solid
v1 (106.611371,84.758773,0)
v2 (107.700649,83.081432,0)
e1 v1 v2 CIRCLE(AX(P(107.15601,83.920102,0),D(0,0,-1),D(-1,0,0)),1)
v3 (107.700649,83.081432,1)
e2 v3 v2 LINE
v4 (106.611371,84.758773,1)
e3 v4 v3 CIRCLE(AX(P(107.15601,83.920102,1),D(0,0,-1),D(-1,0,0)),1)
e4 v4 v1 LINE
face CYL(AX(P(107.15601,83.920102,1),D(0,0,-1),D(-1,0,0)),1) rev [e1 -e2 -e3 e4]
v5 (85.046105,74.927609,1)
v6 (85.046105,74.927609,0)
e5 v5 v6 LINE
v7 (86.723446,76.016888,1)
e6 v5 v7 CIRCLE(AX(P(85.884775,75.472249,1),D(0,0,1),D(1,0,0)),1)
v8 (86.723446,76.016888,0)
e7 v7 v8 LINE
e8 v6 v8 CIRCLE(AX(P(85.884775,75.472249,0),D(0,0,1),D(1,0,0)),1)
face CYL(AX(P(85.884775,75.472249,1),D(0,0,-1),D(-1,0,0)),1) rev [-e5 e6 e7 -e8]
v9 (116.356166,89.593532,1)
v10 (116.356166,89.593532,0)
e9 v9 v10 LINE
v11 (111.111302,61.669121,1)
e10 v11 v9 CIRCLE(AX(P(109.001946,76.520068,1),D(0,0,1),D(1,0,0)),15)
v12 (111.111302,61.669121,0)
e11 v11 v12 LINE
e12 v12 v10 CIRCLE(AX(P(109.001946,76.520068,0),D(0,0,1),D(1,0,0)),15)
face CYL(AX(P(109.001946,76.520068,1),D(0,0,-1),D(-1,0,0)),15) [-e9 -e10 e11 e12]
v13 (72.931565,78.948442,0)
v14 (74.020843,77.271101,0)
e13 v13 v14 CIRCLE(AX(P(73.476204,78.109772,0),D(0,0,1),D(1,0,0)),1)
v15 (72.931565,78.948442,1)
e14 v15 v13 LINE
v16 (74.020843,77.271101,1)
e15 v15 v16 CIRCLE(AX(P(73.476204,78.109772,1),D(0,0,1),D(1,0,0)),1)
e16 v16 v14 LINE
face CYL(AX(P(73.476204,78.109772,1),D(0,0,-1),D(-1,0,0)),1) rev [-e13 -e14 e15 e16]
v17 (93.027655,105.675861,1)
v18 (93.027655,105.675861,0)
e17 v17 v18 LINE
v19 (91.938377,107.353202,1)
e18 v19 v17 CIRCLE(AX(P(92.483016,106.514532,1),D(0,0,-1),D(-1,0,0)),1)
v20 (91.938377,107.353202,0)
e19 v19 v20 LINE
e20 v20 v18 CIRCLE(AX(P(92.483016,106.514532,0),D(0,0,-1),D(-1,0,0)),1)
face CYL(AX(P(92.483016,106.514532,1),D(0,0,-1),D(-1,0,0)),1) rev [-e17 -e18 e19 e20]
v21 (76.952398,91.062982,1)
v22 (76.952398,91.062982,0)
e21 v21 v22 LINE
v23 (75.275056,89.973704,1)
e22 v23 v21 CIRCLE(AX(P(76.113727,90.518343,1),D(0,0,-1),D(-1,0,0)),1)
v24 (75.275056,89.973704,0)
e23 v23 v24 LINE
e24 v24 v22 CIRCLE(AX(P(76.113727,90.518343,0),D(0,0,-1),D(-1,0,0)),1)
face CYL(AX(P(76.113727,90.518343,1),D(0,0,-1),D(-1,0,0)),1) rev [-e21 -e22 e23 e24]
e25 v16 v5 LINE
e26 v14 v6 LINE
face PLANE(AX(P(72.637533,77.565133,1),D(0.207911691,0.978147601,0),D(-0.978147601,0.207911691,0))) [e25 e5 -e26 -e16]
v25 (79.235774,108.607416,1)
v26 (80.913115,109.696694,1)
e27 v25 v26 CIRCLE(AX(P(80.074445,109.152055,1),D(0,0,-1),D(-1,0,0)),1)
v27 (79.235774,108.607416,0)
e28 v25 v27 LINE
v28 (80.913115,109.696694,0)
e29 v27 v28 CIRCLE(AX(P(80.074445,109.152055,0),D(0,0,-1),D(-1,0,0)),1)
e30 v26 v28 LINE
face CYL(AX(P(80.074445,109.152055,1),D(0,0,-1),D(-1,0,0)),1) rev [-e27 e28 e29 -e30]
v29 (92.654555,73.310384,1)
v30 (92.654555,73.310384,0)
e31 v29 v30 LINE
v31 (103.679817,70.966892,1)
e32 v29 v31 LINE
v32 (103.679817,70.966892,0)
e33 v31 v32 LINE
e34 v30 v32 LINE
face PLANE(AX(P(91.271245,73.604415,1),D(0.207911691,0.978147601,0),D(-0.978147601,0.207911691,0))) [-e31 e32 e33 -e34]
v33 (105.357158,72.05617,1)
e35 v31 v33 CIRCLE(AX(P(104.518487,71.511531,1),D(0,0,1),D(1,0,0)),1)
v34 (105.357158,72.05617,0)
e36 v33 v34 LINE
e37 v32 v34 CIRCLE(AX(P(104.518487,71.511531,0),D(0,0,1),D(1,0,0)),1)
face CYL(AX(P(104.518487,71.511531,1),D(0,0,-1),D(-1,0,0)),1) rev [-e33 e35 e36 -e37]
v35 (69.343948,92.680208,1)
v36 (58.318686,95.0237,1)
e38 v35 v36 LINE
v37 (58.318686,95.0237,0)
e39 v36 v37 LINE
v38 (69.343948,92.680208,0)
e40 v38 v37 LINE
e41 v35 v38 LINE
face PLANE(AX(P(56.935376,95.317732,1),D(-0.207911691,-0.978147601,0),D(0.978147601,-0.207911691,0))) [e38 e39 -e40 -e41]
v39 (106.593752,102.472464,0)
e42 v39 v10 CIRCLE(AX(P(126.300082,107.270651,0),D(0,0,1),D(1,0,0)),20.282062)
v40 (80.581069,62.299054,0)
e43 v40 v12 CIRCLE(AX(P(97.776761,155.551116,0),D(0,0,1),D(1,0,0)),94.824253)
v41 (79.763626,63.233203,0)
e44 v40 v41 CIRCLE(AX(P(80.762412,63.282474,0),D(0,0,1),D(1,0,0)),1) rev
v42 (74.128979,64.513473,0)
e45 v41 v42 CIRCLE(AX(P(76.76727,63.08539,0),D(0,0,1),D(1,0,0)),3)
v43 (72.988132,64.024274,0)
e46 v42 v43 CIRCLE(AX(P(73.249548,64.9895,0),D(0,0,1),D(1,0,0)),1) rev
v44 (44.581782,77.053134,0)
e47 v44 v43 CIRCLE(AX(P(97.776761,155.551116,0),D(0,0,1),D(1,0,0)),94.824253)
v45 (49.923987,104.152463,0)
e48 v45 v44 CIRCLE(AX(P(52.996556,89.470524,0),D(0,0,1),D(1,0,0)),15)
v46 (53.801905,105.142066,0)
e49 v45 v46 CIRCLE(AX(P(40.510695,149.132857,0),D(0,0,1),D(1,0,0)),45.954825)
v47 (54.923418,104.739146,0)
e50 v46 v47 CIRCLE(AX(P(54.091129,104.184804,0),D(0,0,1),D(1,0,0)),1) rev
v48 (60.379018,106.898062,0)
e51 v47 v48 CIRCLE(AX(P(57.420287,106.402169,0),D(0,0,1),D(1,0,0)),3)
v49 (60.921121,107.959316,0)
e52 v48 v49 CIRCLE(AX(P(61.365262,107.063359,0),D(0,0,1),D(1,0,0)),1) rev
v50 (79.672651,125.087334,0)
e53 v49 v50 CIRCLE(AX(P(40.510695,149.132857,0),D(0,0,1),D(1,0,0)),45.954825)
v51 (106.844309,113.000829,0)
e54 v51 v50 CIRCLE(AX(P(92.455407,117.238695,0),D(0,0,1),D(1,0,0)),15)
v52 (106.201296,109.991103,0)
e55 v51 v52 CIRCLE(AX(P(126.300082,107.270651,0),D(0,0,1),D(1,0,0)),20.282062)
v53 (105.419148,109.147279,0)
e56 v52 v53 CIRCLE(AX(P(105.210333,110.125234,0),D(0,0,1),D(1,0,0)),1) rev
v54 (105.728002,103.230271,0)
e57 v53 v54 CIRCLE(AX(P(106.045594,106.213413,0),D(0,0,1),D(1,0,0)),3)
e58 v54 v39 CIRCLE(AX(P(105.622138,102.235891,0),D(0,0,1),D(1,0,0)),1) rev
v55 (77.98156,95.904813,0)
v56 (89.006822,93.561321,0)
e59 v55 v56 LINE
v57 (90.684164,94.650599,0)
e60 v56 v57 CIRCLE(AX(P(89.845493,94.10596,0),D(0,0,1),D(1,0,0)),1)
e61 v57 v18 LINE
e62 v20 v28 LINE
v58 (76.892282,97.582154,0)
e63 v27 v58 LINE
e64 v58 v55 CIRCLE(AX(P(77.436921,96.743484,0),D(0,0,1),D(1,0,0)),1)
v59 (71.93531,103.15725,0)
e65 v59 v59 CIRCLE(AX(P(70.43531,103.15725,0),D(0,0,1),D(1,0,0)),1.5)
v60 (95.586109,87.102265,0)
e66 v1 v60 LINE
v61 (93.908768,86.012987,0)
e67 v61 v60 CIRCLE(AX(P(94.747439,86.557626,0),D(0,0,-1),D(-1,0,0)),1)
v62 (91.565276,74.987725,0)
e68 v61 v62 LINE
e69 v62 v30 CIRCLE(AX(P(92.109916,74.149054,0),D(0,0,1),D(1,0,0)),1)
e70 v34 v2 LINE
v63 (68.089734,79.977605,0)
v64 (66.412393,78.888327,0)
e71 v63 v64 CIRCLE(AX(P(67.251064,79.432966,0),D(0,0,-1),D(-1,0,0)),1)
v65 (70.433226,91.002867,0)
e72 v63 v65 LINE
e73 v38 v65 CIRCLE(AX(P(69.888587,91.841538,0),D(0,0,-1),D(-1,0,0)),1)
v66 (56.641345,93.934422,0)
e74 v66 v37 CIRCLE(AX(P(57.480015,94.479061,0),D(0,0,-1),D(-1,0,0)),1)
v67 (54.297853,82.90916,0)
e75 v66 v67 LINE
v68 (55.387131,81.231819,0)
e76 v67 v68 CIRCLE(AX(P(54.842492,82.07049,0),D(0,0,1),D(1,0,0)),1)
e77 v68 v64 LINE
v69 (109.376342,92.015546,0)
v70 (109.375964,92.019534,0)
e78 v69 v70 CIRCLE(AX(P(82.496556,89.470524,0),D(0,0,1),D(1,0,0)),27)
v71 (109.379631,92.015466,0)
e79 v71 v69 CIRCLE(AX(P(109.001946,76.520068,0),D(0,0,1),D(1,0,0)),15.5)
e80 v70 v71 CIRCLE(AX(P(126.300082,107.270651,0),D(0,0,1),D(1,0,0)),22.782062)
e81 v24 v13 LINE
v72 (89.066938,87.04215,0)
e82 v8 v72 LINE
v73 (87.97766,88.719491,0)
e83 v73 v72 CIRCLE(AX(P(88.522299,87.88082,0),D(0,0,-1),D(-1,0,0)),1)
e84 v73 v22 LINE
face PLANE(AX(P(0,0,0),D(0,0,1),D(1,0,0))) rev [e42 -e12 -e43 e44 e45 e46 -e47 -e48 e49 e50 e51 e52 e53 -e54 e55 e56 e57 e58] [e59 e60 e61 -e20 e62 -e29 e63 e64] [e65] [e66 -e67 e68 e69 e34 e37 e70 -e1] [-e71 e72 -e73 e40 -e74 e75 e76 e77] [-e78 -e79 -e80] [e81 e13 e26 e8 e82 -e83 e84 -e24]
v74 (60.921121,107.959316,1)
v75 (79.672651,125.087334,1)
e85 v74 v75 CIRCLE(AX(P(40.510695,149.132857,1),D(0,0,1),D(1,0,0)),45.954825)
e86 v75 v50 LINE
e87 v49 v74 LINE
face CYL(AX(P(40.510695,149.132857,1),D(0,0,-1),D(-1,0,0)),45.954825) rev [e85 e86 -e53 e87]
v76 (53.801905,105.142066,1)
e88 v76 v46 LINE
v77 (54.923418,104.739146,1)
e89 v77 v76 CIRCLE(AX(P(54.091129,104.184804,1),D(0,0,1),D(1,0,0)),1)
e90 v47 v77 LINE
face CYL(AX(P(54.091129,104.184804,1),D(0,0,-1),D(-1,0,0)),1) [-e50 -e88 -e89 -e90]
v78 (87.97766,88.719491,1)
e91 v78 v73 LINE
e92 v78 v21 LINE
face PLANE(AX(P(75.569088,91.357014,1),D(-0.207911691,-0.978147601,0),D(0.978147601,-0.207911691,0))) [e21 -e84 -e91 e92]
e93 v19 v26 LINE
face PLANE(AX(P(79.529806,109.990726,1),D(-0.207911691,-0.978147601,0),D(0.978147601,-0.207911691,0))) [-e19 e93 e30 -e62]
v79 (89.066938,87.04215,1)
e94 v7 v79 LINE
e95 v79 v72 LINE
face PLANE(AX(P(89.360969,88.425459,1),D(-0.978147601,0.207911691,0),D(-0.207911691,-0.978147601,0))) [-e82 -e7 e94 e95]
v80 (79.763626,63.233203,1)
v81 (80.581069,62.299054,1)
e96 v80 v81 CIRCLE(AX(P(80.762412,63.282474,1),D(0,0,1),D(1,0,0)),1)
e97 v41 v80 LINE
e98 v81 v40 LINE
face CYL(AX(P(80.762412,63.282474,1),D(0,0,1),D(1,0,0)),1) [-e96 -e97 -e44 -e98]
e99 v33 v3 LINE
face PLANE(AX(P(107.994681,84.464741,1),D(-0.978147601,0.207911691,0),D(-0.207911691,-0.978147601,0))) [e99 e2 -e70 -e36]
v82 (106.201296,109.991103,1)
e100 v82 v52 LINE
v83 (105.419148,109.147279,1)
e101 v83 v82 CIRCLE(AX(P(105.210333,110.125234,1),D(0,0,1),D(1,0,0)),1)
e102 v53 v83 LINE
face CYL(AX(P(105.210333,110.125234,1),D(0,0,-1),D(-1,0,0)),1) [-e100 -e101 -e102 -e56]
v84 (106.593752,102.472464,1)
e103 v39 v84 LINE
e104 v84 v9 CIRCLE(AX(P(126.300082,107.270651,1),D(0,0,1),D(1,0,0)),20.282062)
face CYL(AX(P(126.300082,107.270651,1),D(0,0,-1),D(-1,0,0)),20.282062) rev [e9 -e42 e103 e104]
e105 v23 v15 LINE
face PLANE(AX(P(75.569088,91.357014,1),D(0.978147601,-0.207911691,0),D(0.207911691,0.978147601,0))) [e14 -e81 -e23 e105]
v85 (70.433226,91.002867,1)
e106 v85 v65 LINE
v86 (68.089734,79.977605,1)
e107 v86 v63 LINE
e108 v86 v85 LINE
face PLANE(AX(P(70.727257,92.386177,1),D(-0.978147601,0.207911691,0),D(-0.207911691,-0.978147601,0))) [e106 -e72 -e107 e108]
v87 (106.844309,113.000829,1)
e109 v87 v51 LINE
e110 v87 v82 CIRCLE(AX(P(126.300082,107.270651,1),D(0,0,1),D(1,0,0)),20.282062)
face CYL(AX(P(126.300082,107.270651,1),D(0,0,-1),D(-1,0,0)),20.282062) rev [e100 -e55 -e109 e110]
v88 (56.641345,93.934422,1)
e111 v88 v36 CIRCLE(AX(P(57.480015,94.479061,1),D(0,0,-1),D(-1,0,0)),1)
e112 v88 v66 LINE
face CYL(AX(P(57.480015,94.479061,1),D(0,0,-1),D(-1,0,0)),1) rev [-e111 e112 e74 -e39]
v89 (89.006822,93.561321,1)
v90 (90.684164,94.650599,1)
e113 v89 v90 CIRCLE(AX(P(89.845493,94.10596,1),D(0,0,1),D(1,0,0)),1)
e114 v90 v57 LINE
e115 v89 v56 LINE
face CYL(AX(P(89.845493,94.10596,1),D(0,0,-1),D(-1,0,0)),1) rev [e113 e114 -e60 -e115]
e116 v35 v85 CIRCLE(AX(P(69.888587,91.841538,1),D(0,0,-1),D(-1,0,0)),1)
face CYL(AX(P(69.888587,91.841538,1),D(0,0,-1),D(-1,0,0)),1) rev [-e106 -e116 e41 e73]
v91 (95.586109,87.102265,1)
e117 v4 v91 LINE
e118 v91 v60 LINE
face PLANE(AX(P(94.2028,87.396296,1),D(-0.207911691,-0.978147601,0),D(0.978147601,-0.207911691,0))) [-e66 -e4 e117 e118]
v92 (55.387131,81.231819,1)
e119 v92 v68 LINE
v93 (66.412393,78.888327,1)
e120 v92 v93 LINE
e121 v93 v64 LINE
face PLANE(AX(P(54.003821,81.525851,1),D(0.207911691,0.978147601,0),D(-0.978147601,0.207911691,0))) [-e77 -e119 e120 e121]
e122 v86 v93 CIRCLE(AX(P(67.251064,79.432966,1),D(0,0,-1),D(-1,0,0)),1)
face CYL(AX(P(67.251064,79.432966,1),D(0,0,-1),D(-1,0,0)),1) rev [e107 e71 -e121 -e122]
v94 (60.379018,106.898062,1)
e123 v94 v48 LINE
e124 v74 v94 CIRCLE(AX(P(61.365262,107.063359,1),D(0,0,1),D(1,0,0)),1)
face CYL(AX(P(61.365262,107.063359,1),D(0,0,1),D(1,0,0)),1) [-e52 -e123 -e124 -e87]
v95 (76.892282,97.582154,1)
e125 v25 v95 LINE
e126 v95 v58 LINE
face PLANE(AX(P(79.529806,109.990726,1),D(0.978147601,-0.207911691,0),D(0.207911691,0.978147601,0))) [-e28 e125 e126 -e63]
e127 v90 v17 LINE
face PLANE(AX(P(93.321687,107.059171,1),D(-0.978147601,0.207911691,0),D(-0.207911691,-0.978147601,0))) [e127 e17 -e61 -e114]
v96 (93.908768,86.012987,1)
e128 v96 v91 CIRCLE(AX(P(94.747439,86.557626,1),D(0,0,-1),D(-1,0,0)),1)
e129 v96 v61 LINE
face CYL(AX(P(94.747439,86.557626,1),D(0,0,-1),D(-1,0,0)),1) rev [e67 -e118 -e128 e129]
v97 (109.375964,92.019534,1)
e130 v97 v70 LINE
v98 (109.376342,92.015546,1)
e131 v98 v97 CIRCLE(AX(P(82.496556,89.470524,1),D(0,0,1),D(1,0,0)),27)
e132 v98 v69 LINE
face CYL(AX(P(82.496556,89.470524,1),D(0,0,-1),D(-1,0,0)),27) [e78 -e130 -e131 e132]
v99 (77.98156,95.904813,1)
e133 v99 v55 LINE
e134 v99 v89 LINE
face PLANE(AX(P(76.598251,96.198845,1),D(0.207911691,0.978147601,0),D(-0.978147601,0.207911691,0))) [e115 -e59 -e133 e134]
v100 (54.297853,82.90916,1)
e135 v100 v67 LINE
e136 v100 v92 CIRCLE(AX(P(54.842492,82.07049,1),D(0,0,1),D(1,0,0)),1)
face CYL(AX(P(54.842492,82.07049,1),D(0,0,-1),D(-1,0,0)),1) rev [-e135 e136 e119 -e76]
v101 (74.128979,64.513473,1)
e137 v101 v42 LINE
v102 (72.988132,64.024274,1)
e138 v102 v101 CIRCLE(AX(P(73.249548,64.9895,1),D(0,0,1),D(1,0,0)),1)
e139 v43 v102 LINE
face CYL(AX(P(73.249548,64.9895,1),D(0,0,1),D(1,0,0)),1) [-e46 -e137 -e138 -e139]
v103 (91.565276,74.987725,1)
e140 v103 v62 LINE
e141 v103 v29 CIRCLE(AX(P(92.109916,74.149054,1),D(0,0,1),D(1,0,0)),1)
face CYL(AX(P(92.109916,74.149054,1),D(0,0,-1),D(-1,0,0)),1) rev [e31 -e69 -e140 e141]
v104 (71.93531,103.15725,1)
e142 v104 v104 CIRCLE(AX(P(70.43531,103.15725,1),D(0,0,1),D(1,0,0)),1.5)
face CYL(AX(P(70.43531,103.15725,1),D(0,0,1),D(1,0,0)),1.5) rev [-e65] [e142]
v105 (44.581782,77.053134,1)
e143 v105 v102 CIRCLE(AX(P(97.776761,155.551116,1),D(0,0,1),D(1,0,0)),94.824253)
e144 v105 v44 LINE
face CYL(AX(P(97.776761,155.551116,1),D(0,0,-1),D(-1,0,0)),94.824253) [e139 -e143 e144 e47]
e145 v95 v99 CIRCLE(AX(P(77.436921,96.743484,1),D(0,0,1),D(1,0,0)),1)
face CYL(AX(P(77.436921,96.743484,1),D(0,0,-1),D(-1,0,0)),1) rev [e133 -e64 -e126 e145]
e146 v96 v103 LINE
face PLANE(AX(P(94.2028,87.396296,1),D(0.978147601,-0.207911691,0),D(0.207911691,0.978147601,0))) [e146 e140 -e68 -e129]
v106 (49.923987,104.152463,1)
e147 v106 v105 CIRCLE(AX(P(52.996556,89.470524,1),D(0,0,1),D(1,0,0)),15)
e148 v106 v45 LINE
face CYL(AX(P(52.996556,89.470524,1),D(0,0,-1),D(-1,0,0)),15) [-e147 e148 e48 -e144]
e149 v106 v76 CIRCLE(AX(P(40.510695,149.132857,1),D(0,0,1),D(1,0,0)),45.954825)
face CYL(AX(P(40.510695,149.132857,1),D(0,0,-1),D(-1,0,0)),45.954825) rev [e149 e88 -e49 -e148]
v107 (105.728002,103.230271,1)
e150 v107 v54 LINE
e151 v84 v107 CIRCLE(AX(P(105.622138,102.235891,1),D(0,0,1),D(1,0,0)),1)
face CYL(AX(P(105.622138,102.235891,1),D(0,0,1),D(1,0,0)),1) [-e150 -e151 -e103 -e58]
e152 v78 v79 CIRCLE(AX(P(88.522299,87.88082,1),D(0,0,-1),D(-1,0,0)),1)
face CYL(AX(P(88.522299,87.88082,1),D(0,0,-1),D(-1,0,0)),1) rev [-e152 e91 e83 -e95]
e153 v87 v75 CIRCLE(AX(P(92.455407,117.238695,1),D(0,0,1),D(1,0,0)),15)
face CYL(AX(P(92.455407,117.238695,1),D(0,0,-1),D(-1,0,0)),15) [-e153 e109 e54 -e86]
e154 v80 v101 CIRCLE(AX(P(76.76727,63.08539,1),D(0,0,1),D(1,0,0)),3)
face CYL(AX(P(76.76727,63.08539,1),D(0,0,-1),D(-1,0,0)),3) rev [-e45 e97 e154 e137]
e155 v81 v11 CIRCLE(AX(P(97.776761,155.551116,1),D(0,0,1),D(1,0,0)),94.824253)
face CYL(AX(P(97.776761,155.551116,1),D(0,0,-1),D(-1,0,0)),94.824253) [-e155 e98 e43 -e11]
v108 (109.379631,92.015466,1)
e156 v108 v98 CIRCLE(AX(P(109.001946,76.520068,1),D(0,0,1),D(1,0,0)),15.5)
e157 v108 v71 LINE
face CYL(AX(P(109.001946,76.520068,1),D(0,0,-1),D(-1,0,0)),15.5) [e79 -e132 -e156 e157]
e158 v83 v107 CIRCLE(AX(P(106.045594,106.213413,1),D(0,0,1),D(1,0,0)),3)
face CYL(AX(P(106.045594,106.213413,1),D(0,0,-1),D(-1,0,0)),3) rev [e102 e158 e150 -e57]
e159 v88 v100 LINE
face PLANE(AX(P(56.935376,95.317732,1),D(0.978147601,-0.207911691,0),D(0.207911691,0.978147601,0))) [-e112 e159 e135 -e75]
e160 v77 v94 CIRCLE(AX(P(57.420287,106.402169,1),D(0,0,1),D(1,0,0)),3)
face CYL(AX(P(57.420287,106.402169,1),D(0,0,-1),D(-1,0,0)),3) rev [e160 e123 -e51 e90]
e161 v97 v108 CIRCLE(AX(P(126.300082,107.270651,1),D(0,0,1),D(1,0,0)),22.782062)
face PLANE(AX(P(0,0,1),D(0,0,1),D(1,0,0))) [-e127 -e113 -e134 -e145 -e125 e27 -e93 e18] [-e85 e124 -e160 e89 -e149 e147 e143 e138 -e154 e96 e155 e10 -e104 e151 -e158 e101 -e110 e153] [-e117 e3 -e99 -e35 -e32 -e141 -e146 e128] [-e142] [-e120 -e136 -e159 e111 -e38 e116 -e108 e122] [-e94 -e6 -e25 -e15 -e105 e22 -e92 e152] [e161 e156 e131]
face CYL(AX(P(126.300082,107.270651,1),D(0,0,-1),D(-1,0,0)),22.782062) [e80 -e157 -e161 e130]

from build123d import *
from build123d.topology import SkipClean

# Parameters (mm, degrees)
BOSS_EXTRUDE1_DEPTH   = 1
SKETCH8_3_R           = 3
CUT_EXTRUDE1_DEPTH    = 182.285837692
CUT_EXTRUDE2_DEPTH    = 182.285837692
SKETCH10_W            = 14.1
SKETCH10_H            = 14.1
CUT_EXTRUDE3_DEPTH    = 185.637780297
F_3_0MM_DOWEL_HOLE1_D = 3
FILLET1_R             = 1


with BuildPart() as part:
    # Sketch8 → Boss-Extrude1 (new body)
    with BuildSketch(Plane.XY):
        with BuildLine():
            ThreePointArc((73.852303576, 63.794594289), (73.863549821, 63.839319131), (73.875482243, 63.883865813))
            ThreePointArc((73.875482243, 63.883865813), (76.767270103, 63.085390407), (79.729789892, 62.612657392))
            ThreePointArc((79.729789892, 62.612657392), (79.717062502, 62.538833177), (79.702495752, 62.465349771))
            ThreePointArc((79.702495752, 62.465349771), (95.373691885, 60.7573177), (111.111302129, 61.669121188))
            ThreePointArc((111.111302129, 61.669121188), (123.74416397, 73.75113123), (116.356165737, 89.593531525))
            ThreePointArc((116.356165737, 89.593531525), (107.510169126, 99.635128091), (106.844308874, 113.000828513))
            ThreePointArc((106.844308874, 113.000828513), (98.551785503, 130.943955248), (79.67265081, 125.087333856))
            ThreePointArc((79.67265081, 125.087333856), (66.957923375, 111.551078569), (49.923987164, 104.152462611))
            ThreePointArc((49.923987164, 104.152462611), (38.279791522, 92.371702096), (44.581782069, 77.053134095))
            ThreePointArc((44.581782069, 77.053134095), (58.651333394, 69.17496271), (73.852303576, 63.794594289))
        make_face()
        with BuildLine():
            ThreePointArc((56.72077423, 104.000844147), (56.721683918, 104.00117089), (56.7225936, 104.001497652))
            ThreePointArc((56.7225936, 104.001497652), (56.755397532, 103.992206145), (56.788325126, 103.983362865))
            ThreePointArc((56.788325126, 103.983362865), (56.754559843, 103.992142785), (56.72077423, 104.000844147))
        make_face(mode=Mode.SUBTRACT)
        with BuildLine():
            ThreePointArc((109.376341775, 92.015545509), (109.37615287, 92.017539878), (109.375963817, 92.019534234))
            ThreePointArc((109.375963817, 92.019534234), (109.377797318, 92.017499849), (109.379631064, 92.015465685))
            ThreePointArc((109.379631064, 92.015465685), (109.377986421, 92.015505684), (109.376341775, 92.015545509))
        make_face(mode=Mode.SUBTRACT)
        with BuildLine():
            ThreePointArc((103.532400156, 106.396636288), (103.543227812, 106.407709628), (103.554044399, 106.418793781))
            ThreePointArc((103.554044399, 106.418793781), (103.552293137, 106.396310438), (103.550744757, 106.373812212))
            ThreePointArc((103.550744757, 106.373812212), (103.541575551, 106.385226737), (103.532400156, 106.396636288))
        make_face(mode=Mode.SUBTRACT)
        with BuildLine():
            ThreePointArc((104.021801646, 107.681154775), (104.021865069, 107.684582448), (104.021929019, 107.688010111))
            ThreePointArc((104.021929019, 107.688010111), (104.063142491, 107.7381429), (104.104138674, 107.788453533))
            ThreePointArc((104.104138674, 107.788453533), (104.062244422, 107.735361058), (104.021801646, 107.681154775))
        make_face(mode=Mode.SUBTRACT)
    extrude(amount=BOSS_EXTRUDE1_DEPTH)

    # Sketch8<3> → Cut-Extrude1 (cut, through all)
    with SkipClean():  # the faces are left unmerged after this step: merging them gives an invalid solid
        with BuildSketch(Plane.XY):
            with Locations((106.04559389, 106.21341333)):
                Circle(SKETCH8_3_R)
            with Locations((76.767270103, 63.085390407)):
                Circle(SKETCH8_3_R)
            with Locations((57.420286528, 106.402169345)):
                Circle(SKETCH8_3_R)
        extrude(amount=CUT_EXTRUDE1_DEPTH, mode=Mode.SUBTRACT)

    # Sketch14 → Cut-Extrude2 (cut, through all)
    with SkipClean():  # the faces are left unmerged after this step: merging them gives an invalid solid
        with BuildSketch(Plane.XY):
            with BuildLine():
                Line((54.297852906, 82.909160119), (55.387130976, 81.231818983))
                ThreePointArc((55.387130976, 81.231818983), (54.003821373, 81.525850516), (54.297852906, 82.909160119))
            make_face()
            with BuildLine():
                Line((56.641344681, 93.934422083), (58.318685817, 95.023700153))
                ThreePointArc((58.318685817, 95.023700153), (56.935376214, 95.317731686), (56.641344681, 93.934422083))
            make_face()
            with BuildLine():
                Line((69.343947781, 92.680208378), (70.433225851, 91.002867242))
                ThreePointArc((70.433225851, 91.002867242), (70.727257384, 92.386176845), (69.343947781, 92.680208378))
            make_face()
            with BuildLine():
                Line((68.089734077, 79.977605278), (66.412392941, 78.888327208))
                ThreePointArc((66.412392941, 78.888327208), (67.795702544, 78.594295675), (68.089734077, 79.977605278))
            make_face()
            with BuildLine():
                Line((75.275056475, 89.973704373), (76.952397611, 91.062982443))
                ThreePointArc((76.952397611, 91.062982443), (75.569088008, 91.357013976), (75.275056475, 89.973704373))
            make_face()
            with BuildLine():
                Line((72.9315647, 78.948442409), (74.02084277, 77.271101273))
                ThreePointArc((74.02084277, 77.271101273), (72.637533167, 77.565132806), (72.9315647, 78.948442409))
            make_face()
            with BuildLine():
                Line((85.046104735, 74.927609498), (86.723445871, 76.016887568))
                ThreePointArc((86.723445871, 76.016887568), (86.429414338, 74.633577965), (85.046104735, 74.927609498))
            make_face()
            with BuildLine():
                Line((89.066937645, 87.042149532), (87.977659575, 88.719490668))
                ThreePointArc((87.977659575, 88.719490668), (89.360969178, 88.425459135), (89.066937645, 87.042149532))
            make_face()
            with BuildLine():
                Line((89.006822445, 93.561321292), (90.684163581, 94.650599362))
                ThreePointArc((90.684163581, 94.650599362), (90.390132048, 93.267289759), (89.006822445, 93.561321292))
            make_face()
            with BuildLine():
                Line((76.89228241, 97.582154203), (77.981560481, 95.904813067))
                ThreePointArc((77.981560481, 95.904813067), (76.598250878, 96.1988446), (76.89228241, 97.582154203))
            make_face()
            with BuildLine():
                Line((91.938377285, 107.353202462), (93.027655356, 105.675861326))
                ThreePointArc((93.027655356, 105.675861326), (93.321686888, 107.059170929), (91.938377285, 107.353202462))
            make_face()
            with BuildLine():
                Line((79.235774185, 108.607416167), (80.913115321, 109.696694237))
                ThreePointArc((80.913115321, 109.696694237), (79.529805718, 109.99072577), (79.235774185, 108.607416167))
            make_face()
            with BuildLine():
                Line((93.908768269, 86.012986663), (95.586109405, 87.102264733))
                ThreePointArc((95.586109405, 87.102264733), (94.202799802, 87.396296266), (93.908768269, 86.012986663))
            make_face()
            with BuildLine():
                Line((91.565276494, 74.987724698), (92.654554564, 73.310383563))
                ThreePointArc((92.654554564, 73.310383563), (91.271244961, 73.604415095), (91.565276494, 74.987724698))
            make_face()
            with BuildLine():
                Line((103.679816529, 70.966891788), (105.357157665, 72.056169858))
                ThreePointArc((105.357157665, 72.056169858), (105.063126132, 70.672860255), (103.679816529, 70.966891788))
            make_face()
            with BuildLine():
                Line((106.611371369, 84.758772958), (107.700649439, 83.081431822))
                ThreePointArc((107.700649439, 83.081431822), (107.994680972, 84.464741425), (106.611371369, 84.758772958))
            make_face()
        extrude(amount=CUT_EXTRUDE2_DEPTH, mode=Mode.SUBTRACT)

    # Sketch10 → Cut-Extrude3 (cut, through all)
    with SkipClean():  # the faces are left unmerged after this step: merging them gives an invalid solid
        with BuildSketch(Plane(origin=(-22.098060608, 19.345391025, 0), x_dir=(0.9781476007338056, -0.2079116908177598, 0), z_dir=(0, 0, 1))):
            with Locations((68.560828803, 83.69413822)):
                Rectangle(SKETCH10_W, SKETCH10_H)
            with Locations((87.610828803, 83.69413822)):
                Rectangle(SKETCH10_W, SKETCH10_H)
            with Locations((106.660828803, 83.69413822)):
                Rectangle(SKETCH10_W, SKETCH10_H)
            with Locations((87.610828803, 102.74413822)):
                Rectangle(SKETCH10_W, SKETCH10_H)
        extrude(amount=CUT_EXTRUDE3_DEPTH, mode=Mode.SUBTRACT)

    # Ø3.0mm Dowel Hole1 (through all)
    with Locations(Plane.XY.offset(1)):
        with Locations((70.435309654, 103.157249982)):
            Hole(F_3_0MM_DOWEL_HOLE1_D / 2)

    # Fillet1
    fillet1_edges = [part.edges().sort_by_distance(p)[0] for p in [
        (79.702495752, 62.465349771, 0.5),
        (73.852303576, 63.794594289, 0.5),
        (106.42311517, 103.237261841, 0.5),
        (106.111211206, 109.212695638, 0.5),
        (54.596217873, 105.389926178, 0.5),
        (60.17229201, 107.596516793, 0.5),
    ]]
    fillet(fillet1_edges, radius=FILLET1_R)


solid = part.part
